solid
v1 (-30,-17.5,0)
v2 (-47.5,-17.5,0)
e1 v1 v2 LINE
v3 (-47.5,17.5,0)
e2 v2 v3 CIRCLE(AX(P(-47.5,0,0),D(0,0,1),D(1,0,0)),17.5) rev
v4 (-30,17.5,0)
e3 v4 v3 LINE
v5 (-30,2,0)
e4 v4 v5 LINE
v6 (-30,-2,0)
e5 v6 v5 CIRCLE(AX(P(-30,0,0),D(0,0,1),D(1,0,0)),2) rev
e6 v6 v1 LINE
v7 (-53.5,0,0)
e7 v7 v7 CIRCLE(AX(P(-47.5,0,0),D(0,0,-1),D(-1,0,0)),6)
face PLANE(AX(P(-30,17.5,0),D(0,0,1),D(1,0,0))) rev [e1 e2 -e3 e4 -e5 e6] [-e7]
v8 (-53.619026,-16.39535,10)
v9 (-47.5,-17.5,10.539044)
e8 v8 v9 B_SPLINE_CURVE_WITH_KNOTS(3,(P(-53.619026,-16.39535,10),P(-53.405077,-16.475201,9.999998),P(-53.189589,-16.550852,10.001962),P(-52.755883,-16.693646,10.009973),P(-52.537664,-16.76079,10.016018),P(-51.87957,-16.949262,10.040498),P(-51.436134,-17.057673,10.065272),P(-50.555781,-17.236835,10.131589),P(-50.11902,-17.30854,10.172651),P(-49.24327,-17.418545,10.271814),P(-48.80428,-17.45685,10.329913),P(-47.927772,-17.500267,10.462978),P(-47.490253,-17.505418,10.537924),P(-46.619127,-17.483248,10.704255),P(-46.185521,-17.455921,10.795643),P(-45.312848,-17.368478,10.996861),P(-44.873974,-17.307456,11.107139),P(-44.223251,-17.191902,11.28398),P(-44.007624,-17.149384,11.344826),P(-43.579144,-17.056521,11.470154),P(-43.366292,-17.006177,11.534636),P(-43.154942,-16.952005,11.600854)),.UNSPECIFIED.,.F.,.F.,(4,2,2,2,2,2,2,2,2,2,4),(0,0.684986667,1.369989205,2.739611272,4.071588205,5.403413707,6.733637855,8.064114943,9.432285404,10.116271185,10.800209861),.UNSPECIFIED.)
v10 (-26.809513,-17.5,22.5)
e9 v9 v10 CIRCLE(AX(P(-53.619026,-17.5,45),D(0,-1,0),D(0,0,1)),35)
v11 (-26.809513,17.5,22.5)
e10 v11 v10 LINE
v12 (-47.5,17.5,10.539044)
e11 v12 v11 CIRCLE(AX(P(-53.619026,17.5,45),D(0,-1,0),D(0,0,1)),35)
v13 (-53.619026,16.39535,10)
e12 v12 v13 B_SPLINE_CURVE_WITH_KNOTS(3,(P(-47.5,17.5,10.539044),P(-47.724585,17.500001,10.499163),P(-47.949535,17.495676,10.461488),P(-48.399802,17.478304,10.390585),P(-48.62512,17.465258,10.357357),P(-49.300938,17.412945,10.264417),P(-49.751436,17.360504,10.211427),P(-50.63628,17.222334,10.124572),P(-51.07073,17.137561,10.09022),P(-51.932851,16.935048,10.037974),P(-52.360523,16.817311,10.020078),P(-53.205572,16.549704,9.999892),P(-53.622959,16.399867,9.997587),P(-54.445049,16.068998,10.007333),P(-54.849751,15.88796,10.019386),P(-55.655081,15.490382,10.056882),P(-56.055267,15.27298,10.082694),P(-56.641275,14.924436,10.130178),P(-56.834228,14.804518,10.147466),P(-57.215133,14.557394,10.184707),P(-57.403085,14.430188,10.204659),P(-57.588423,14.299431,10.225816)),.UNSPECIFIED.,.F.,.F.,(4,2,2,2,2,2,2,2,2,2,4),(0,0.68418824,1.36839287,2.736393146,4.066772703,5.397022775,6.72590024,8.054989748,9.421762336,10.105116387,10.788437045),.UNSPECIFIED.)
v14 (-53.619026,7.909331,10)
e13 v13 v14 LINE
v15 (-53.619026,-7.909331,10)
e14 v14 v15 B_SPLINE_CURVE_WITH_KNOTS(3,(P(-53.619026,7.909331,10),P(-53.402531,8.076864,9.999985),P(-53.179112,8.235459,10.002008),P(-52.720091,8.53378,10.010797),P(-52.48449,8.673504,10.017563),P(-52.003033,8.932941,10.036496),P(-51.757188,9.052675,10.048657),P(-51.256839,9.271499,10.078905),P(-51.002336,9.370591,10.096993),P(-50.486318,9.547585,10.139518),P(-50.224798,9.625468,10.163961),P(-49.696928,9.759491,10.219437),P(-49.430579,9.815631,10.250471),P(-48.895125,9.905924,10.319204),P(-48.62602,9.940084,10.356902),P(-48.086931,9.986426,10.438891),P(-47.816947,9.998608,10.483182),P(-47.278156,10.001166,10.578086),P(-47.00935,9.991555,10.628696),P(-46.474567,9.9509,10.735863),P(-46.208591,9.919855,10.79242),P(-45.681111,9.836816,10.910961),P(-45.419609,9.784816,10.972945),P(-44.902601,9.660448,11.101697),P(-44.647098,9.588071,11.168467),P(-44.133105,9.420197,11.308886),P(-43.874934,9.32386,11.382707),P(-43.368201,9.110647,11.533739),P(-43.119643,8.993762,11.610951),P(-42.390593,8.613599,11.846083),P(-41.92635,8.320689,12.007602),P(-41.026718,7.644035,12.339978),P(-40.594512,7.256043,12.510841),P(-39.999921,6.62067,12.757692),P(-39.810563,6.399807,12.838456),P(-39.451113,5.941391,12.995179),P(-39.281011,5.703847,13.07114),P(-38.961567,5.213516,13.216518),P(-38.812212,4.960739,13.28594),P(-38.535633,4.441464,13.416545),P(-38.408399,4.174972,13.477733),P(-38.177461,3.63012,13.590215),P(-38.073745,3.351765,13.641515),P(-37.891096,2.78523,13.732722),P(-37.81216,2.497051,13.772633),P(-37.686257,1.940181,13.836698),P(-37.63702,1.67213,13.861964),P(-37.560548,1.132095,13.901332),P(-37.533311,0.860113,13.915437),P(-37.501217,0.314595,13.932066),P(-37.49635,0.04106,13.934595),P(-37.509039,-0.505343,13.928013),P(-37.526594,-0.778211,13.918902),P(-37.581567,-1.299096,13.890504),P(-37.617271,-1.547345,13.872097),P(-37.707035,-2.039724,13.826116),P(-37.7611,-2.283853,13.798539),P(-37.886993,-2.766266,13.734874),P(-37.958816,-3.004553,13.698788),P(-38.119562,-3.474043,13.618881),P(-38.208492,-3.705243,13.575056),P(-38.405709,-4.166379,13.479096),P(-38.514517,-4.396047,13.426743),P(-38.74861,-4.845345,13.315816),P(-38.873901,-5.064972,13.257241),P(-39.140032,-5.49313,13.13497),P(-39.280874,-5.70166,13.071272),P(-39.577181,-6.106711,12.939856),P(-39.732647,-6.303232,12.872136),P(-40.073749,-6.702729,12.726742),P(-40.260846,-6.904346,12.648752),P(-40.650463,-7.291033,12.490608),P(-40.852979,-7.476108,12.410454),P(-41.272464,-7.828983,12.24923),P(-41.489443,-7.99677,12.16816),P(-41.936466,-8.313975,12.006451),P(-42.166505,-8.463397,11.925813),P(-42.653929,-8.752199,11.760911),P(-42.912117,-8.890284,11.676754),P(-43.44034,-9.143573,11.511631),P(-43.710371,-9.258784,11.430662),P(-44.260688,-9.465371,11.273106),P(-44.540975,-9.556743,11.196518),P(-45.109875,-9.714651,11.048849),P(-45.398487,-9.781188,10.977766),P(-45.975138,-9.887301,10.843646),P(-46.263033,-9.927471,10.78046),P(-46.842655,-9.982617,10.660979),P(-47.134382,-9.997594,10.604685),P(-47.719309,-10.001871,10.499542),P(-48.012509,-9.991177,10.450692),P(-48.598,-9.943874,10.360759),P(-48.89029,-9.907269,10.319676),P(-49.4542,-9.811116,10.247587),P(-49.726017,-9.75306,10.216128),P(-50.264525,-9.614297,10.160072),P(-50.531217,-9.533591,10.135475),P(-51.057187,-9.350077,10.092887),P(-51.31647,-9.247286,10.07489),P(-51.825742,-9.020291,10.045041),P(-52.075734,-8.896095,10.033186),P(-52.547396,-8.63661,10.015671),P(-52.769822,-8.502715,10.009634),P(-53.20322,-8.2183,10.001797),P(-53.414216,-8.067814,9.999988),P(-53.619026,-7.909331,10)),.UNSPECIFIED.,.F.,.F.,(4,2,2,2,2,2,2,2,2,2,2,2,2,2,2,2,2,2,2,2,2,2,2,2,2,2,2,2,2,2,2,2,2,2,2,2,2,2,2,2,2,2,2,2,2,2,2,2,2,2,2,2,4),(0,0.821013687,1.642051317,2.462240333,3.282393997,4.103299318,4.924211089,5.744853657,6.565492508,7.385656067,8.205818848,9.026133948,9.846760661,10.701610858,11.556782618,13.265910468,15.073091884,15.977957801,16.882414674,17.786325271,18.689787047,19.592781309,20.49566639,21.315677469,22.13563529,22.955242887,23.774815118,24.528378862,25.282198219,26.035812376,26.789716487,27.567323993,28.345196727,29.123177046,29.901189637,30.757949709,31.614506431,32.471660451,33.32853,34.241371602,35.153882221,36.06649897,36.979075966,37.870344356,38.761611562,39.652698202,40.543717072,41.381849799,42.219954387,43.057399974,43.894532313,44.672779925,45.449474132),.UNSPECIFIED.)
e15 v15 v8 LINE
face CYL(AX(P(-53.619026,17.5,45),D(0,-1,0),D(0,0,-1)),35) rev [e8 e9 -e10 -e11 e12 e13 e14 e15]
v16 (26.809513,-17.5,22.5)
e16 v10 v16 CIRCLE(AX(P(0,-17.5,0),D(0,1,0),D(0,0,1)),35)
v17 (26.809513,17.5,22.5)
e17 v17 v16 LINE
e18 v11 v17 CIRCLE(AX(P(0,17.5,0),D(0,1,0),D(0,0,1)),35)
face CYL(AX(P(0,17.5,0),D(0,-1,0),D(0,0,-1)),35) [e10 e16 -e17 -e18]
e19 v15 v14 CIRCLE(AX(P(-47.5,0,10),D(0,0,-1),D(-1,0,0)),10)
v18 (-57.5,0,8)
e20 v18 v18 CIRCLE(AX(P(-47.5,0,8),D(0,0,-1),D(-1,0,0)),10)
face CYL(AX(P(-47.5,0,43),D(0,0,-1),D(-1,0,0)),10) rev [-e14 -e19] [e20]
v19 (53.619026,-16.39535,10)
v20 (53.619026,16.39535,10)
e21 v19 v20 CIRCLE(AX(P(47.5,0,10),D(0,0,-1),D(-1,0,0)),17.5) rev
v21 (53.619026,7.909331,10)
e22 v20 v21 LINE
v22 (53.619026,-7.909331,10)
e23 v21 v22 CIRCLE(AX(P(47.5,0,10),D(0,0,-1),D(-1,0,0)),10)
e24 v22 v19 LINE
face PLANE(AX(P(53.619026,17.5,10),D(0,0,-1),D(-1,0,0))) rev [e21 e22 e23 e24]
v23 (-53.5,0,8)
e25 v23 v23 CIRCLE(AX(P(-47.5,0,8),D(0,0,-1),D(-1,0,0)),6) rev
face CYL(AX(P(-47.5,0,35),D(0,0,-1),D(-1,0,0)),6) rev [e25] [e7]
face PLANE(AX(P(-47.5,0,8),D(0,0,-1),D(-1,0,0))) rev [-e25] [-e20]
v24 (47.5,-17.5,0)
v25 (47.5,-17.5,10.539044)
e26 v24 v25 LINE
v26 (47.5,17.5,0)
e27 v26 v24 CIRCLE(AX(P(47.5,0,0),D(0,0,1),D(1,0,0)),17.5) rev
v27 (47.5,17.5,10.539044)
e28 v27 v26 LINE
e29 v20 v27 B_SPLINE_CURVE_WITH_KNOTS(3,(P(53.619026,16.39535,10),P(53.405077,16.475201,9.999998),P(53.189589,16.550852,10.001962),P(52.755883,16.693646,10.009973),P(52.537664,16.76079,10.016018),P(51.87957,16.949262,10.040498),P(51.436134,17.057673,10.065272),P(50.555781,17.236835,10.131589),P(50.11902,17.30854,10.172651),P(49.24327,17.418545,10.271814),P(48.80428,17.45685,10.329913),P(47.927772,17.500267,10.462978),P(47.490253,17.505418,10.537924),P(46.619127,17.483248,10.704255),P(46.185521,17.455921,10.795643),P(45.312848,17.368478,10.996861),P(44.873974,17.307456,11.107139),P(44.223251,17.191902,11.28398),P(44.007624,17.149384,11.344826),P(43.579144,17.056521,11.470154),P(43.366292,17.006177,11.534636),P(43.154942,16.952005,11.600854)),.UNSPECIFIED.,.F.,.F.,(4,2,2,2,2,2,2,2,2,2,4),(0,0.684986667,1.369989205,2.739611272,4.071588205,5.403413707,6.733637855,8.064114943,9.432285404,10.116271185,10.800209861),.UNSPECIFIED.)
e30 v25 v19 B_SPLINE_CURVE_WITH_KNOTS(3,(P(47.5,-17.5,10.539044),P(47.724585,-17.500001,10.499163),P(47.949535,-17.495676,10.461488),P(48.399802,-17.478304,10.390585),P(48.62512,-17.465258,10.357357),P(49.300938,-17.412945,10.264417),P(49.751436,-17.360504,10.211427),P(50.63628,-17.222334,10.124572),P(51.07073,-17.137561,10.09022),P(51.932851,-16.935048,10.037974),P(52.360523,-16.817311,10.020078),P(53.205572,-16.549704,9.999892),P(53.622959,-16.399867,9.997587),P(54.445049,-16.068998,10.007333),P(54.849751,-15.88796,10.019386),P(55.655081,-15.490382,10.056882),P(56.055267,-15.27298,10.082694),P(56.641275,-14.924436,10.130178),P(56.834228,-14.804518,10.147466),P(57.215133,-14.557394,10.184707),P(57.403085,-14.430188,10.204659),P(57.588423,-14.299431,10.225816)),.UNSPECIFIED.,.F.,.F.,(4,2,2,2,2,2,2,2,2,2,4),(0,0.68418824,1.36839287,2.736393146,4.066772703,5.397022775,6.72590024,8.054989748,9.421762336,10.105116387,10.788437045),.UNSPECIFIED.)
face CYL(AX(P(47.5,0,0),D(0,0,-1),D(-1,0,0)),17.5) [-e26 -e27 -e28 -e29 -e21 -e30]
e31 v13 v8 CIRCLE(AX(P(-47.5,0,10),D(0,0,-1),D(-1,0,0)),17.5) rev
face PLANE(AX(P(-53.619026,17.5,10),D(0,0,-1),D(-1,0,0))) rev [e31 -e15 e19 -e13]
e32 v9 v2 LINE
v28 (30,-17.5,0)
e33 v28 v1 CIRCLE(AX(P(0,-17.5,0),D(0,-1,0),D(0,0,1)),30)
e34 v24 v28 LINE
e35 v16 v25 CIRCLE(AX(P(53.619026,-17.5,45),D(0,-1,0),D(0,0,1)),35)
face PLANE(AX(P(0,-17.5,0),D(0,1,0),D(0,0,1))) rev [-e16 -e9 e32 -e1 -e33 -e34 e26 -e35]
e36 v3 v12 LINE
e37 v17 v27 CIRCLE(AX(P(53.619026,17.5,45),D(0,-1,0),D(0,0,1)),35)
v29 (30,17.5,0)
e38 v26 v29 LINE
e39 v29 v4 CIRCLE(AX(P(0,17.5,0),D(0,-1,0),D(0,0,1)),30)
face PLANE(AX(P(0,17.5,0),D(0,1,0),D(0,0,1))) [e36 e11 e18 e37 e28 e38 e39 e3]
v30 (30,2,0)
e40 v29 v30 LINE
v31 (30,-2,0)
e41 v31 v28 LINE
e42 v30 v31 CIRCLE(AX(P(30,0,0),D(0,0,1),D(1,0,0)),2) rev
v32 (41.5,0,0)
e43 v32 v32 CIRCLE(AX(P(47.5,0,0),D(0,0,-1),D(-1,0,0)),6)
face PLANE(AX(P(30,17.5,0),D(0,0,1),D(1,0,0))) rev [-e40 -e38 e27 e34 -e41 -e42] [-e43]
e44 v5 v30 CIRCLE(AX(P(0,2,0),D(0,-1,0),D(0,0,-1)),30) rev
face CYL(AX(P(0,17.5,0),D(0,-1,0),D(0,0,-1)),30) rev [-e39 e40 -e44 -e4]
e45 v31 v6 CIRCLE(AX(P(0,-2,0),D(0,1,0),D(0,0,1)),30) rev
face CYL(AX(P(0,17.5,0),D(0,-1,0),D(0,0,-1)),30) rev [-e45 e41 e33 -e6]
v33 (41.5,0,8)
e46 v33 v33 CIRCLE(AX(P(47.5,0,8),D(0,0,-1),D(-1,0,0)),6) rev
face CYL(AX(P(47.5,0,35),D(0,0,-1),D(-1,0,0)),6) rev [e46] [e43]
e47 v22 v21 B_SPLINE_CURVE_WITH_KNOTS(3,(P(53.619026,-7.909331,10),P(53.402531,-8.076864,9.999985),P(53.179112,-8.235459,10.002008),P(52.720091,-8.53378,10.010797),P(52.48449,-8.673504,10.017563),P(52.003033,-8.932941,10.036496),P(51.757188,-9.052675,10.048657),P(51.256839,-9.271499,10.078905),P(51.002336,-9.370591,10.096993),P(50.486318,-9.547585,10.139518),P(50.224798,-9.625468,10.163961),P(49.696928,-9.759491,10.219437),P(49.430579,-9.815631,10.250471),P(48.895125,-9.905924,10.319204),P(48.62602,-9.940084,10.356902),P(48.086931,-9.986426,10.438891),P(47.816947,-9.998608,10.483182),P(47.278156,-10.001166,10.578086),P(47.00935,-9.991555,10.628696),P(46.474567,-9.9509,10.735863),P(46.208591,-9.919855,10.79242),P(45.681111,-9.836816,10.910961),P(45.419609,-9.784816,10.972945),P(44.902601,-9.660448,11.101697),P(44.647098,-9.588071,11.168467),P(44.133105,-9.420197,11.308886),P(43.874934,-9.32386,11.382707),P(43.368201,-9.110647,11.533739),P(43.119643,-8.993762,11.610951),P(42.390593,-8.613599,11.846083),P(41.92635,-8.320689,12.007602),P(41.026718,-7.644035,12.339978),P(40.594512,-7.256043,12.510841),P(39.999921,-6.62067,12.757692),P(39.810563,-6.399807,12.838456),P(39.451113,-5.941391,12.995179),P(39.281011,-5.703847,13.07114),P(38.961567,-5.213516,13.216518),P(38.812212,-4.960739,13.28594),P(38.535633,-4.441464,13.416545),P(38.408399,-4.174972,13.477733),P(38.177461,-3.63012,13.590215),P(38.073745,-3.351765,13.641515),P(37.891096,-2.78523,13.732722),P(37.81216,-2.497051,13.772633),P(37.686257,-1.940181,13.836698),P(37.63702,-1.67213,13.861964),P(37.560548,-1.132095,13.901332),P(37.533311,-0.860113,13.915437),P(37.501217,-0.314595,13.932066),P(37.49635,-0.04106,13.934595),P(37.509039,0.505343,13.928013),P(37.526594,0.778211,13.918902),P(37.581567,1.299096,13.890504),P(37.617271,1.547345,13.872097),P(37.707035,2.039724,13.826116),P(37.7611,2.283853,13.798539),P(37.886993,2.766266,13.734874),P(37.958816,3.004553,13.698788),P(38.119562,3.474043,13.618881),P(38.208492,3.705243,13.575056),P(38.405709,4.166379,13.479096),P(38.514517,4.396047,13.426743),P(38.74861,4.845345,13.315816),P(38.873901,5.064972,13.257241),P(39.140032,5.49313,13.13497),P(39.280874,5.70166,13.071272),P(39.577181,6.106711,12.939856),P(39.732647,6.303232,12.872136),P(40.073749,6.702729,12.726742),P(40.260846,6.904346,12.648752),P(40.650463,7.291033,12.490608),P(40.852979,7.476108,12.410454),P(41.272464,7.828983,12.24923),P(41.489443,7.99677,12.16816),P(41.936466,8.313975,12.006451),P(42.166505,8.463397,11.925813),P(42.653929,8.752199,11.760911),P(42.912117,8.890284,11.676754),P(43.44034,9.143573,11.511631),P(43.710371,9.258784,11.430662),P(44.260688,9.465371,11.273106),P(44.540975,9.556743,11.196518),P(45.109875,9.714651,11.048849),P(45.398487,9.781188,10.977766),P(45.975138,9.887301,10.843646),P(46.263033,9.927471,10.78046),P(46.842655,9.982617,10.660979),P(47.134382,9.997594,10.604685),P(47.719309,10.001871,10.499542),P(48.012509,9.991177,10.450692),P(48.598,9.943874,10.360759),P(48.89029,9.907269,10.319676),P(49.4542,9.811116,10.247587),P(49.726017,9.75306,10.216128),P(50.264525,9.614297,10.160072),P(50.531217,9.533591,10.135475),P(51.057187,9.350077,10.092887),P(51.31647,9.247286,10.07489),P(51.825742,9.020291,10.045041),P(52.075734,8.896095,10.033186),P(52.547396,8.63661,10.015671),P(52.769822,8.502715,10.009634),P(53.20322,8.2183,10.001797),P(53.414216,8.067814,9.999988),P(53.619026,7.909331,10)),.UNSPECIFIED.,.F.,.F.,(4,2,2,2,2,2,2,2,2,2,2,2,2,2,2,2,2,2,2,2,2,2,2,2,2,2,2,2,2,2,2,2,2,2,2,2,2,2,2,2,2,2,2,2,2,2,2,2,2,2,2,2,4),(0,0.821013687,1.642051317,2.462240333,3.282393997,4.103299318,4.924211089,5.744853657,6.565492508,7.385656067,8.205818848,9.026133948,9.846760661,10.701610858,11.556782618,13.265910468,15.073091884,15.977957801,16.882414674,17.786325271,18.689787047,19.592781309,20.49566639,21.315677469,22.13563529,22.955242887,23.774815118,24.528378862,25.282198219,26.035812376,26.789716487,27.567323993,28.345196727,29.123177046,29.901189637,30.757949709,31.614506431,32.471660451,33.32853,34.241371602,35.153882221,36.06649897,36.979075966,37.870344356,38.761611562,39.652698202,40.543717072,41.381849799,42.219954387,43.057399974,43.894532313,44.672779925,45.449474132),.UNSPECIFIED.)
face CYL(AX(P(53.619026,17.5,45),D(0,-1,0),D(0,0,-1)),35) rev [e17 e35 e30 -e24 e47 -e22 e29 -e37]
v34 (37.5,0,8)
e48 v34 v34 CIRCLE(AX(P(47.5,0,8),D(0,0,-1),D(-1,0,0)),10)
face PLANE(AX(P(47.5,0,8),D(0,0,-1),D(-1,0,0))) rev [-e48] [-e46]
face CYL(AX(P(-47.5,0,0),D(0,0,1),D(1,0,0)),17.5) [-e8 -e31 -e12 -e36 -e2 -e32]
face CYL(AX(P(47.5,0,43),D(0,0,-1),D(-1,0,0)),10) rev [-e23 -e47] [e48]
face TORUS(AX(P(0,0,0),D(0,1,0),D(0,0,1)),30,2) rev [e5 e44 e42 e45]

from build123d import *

# Parameters (mm, degrees)
BOSS_EXTRUDE1_DEPTH = 17.5
SKETCH2_R           = 6
CUT_EXTRUDE1_DEPTH  = 35
SKETCH3_R           = 2
FILLET1_DEPTH       = 35
FILLET2_DEPTH       = 35
CUT_EXTRUDE2_START  = -8
SKETCH4_R           = 10
CUT_EXTRUDE2_DEPTH  = 35


with BuildPart() as part:
    # Sketch1 → Boss-Extrude1 (new, symmetric)
    with BuildSketch(Plane(origin=(0, 0, 0), x_dir=(1, 0, 0), z_dir=(0, 1, 0))):
        with BuildLine():
            Line((30, 0), (65, 0))
            Line((65, 0), (65, -10))
            Line((65, -10), (53.619026474, -10))
            ThreePointArc((53.619026474, -10), (38.828827016, -13.278556149), (26.809513237, -22.5))
            ThreePointArc((26.809513237, -22.5), (0, -35), (-26.809513237, -22.5))
            ThreePointArc((-26.809513237, -22.5), (-38.828827016, -13.278556149), (-53.619026474, -10))
            Line((-53.619026474, -10), (-65, -10))
            Line((-65, -10), (-65, 0))
            Line((-65, 0), (-30, 0))
            ThreePointArc((-30, 0), (0, -30), (30, 0))
        make_face()
    extrude(amount=BOSS_EXTRUDE1_DEPTH, both=True)

    # Sketch2 → Cut-Extrude1 (cut)
    with BuildSketch(Plane(origin=(0, 0, 0), x_dir=(-1, 0, 0), z_dir=(0, 0, -1))):
        with Locations((47.5, 0)):
            Circle(SKETCH2_R)
        with Locations((-47.5, 0)):
            Circle(SKETCH2_R)
    extrude(amount=-CUT_EXTRUDE1_DEPTH, mode=Mode.SUBTRACT)

    # Sketch3 → Cut-Revolve1 (revolve, cut)
    with BuildSketch(Plane(origin=(0, 0, 0), x_dir=(-1, 0, 0), z_dir=(0, 0, -1))):
        with Locations((30, 0)):
            Circle(SKETCH3_R)
    revolve(axis=Axis((0, 17.5, 0), (0, -1, 0)), mode=Mode.SUBTRACT)

    # Fillet1: read off the stored shape, not the designer's step
    # Fillet1 outline → Fillet1 (cut)
    with BuildSketch(Plane.XY):
        with BuildLine():
            Line((65, 17.5), (47.5, 17.5))
            ThreePointArc((47.5, 17.5), (59.87436864, 12.374368701), (65, 8.6e-08))
            Line((65, 8.6e-08), (65, 17.5))
        make_face()
        with BuildLine():
            Line((65, -17.5), (65, 8.6e-08))
            ThreePointArc((65, 8.6e-08), (59.874368701, -12.374368641), (47.499999999, -17.5))
            Line((47.499999999, -17.5), (65, -17.5))
        make_face()
    extrude(amount=FILLET1_DEPTH, mode=Mode.SUBTRACT)

    # Fillet2: read off the stored shape, not the designer's step
    # Fillet2 outline → Fillet2 (cut)
    with BuildSketch(Plane.XY):
        with BuildLine():
            ThreePointArc((-47.5, -17.5), (-59.874368677, -12.374368665), (-65, 1.8e-08))
            Line((-65, 1.8e-08), (-65, -17.5))
            Line((-65, -17.5), (-47.5, -17.5))
        make_face()
        with BuildLine():
            ThreePointArc((-65, 1.8e-08), (-59.874368665, 12.374368677), (-47.5, 17.5))
            Line((-47.5, 17.5), (-65, 17.5))
            Line((-65, 17.5), (-65, 1.8e-08))
        make_face()
    extrude(amount=FILLET2_DEPTH, mode=Mode.SUBTRACT)

    # Sketch4 → Cut-Extrude2 (cut)
    with BuildSketch(Plane(origin=(0, 0, 0), x_dir=(-1, 0, 0), z_dir=(0, 0, -1)).offset(CUT_EXTRUDE2_START)):
        with Locations((-47.5, 0)):
            Circle(SKETCH4_R)
        with Locations((47.5, 0)):
            Circle(SKETCH4_R)
    extrude(amount=-CUT_EXTRUDE2_DEPTH, mode=Mode.SUBTRACT)


solid = part.part
